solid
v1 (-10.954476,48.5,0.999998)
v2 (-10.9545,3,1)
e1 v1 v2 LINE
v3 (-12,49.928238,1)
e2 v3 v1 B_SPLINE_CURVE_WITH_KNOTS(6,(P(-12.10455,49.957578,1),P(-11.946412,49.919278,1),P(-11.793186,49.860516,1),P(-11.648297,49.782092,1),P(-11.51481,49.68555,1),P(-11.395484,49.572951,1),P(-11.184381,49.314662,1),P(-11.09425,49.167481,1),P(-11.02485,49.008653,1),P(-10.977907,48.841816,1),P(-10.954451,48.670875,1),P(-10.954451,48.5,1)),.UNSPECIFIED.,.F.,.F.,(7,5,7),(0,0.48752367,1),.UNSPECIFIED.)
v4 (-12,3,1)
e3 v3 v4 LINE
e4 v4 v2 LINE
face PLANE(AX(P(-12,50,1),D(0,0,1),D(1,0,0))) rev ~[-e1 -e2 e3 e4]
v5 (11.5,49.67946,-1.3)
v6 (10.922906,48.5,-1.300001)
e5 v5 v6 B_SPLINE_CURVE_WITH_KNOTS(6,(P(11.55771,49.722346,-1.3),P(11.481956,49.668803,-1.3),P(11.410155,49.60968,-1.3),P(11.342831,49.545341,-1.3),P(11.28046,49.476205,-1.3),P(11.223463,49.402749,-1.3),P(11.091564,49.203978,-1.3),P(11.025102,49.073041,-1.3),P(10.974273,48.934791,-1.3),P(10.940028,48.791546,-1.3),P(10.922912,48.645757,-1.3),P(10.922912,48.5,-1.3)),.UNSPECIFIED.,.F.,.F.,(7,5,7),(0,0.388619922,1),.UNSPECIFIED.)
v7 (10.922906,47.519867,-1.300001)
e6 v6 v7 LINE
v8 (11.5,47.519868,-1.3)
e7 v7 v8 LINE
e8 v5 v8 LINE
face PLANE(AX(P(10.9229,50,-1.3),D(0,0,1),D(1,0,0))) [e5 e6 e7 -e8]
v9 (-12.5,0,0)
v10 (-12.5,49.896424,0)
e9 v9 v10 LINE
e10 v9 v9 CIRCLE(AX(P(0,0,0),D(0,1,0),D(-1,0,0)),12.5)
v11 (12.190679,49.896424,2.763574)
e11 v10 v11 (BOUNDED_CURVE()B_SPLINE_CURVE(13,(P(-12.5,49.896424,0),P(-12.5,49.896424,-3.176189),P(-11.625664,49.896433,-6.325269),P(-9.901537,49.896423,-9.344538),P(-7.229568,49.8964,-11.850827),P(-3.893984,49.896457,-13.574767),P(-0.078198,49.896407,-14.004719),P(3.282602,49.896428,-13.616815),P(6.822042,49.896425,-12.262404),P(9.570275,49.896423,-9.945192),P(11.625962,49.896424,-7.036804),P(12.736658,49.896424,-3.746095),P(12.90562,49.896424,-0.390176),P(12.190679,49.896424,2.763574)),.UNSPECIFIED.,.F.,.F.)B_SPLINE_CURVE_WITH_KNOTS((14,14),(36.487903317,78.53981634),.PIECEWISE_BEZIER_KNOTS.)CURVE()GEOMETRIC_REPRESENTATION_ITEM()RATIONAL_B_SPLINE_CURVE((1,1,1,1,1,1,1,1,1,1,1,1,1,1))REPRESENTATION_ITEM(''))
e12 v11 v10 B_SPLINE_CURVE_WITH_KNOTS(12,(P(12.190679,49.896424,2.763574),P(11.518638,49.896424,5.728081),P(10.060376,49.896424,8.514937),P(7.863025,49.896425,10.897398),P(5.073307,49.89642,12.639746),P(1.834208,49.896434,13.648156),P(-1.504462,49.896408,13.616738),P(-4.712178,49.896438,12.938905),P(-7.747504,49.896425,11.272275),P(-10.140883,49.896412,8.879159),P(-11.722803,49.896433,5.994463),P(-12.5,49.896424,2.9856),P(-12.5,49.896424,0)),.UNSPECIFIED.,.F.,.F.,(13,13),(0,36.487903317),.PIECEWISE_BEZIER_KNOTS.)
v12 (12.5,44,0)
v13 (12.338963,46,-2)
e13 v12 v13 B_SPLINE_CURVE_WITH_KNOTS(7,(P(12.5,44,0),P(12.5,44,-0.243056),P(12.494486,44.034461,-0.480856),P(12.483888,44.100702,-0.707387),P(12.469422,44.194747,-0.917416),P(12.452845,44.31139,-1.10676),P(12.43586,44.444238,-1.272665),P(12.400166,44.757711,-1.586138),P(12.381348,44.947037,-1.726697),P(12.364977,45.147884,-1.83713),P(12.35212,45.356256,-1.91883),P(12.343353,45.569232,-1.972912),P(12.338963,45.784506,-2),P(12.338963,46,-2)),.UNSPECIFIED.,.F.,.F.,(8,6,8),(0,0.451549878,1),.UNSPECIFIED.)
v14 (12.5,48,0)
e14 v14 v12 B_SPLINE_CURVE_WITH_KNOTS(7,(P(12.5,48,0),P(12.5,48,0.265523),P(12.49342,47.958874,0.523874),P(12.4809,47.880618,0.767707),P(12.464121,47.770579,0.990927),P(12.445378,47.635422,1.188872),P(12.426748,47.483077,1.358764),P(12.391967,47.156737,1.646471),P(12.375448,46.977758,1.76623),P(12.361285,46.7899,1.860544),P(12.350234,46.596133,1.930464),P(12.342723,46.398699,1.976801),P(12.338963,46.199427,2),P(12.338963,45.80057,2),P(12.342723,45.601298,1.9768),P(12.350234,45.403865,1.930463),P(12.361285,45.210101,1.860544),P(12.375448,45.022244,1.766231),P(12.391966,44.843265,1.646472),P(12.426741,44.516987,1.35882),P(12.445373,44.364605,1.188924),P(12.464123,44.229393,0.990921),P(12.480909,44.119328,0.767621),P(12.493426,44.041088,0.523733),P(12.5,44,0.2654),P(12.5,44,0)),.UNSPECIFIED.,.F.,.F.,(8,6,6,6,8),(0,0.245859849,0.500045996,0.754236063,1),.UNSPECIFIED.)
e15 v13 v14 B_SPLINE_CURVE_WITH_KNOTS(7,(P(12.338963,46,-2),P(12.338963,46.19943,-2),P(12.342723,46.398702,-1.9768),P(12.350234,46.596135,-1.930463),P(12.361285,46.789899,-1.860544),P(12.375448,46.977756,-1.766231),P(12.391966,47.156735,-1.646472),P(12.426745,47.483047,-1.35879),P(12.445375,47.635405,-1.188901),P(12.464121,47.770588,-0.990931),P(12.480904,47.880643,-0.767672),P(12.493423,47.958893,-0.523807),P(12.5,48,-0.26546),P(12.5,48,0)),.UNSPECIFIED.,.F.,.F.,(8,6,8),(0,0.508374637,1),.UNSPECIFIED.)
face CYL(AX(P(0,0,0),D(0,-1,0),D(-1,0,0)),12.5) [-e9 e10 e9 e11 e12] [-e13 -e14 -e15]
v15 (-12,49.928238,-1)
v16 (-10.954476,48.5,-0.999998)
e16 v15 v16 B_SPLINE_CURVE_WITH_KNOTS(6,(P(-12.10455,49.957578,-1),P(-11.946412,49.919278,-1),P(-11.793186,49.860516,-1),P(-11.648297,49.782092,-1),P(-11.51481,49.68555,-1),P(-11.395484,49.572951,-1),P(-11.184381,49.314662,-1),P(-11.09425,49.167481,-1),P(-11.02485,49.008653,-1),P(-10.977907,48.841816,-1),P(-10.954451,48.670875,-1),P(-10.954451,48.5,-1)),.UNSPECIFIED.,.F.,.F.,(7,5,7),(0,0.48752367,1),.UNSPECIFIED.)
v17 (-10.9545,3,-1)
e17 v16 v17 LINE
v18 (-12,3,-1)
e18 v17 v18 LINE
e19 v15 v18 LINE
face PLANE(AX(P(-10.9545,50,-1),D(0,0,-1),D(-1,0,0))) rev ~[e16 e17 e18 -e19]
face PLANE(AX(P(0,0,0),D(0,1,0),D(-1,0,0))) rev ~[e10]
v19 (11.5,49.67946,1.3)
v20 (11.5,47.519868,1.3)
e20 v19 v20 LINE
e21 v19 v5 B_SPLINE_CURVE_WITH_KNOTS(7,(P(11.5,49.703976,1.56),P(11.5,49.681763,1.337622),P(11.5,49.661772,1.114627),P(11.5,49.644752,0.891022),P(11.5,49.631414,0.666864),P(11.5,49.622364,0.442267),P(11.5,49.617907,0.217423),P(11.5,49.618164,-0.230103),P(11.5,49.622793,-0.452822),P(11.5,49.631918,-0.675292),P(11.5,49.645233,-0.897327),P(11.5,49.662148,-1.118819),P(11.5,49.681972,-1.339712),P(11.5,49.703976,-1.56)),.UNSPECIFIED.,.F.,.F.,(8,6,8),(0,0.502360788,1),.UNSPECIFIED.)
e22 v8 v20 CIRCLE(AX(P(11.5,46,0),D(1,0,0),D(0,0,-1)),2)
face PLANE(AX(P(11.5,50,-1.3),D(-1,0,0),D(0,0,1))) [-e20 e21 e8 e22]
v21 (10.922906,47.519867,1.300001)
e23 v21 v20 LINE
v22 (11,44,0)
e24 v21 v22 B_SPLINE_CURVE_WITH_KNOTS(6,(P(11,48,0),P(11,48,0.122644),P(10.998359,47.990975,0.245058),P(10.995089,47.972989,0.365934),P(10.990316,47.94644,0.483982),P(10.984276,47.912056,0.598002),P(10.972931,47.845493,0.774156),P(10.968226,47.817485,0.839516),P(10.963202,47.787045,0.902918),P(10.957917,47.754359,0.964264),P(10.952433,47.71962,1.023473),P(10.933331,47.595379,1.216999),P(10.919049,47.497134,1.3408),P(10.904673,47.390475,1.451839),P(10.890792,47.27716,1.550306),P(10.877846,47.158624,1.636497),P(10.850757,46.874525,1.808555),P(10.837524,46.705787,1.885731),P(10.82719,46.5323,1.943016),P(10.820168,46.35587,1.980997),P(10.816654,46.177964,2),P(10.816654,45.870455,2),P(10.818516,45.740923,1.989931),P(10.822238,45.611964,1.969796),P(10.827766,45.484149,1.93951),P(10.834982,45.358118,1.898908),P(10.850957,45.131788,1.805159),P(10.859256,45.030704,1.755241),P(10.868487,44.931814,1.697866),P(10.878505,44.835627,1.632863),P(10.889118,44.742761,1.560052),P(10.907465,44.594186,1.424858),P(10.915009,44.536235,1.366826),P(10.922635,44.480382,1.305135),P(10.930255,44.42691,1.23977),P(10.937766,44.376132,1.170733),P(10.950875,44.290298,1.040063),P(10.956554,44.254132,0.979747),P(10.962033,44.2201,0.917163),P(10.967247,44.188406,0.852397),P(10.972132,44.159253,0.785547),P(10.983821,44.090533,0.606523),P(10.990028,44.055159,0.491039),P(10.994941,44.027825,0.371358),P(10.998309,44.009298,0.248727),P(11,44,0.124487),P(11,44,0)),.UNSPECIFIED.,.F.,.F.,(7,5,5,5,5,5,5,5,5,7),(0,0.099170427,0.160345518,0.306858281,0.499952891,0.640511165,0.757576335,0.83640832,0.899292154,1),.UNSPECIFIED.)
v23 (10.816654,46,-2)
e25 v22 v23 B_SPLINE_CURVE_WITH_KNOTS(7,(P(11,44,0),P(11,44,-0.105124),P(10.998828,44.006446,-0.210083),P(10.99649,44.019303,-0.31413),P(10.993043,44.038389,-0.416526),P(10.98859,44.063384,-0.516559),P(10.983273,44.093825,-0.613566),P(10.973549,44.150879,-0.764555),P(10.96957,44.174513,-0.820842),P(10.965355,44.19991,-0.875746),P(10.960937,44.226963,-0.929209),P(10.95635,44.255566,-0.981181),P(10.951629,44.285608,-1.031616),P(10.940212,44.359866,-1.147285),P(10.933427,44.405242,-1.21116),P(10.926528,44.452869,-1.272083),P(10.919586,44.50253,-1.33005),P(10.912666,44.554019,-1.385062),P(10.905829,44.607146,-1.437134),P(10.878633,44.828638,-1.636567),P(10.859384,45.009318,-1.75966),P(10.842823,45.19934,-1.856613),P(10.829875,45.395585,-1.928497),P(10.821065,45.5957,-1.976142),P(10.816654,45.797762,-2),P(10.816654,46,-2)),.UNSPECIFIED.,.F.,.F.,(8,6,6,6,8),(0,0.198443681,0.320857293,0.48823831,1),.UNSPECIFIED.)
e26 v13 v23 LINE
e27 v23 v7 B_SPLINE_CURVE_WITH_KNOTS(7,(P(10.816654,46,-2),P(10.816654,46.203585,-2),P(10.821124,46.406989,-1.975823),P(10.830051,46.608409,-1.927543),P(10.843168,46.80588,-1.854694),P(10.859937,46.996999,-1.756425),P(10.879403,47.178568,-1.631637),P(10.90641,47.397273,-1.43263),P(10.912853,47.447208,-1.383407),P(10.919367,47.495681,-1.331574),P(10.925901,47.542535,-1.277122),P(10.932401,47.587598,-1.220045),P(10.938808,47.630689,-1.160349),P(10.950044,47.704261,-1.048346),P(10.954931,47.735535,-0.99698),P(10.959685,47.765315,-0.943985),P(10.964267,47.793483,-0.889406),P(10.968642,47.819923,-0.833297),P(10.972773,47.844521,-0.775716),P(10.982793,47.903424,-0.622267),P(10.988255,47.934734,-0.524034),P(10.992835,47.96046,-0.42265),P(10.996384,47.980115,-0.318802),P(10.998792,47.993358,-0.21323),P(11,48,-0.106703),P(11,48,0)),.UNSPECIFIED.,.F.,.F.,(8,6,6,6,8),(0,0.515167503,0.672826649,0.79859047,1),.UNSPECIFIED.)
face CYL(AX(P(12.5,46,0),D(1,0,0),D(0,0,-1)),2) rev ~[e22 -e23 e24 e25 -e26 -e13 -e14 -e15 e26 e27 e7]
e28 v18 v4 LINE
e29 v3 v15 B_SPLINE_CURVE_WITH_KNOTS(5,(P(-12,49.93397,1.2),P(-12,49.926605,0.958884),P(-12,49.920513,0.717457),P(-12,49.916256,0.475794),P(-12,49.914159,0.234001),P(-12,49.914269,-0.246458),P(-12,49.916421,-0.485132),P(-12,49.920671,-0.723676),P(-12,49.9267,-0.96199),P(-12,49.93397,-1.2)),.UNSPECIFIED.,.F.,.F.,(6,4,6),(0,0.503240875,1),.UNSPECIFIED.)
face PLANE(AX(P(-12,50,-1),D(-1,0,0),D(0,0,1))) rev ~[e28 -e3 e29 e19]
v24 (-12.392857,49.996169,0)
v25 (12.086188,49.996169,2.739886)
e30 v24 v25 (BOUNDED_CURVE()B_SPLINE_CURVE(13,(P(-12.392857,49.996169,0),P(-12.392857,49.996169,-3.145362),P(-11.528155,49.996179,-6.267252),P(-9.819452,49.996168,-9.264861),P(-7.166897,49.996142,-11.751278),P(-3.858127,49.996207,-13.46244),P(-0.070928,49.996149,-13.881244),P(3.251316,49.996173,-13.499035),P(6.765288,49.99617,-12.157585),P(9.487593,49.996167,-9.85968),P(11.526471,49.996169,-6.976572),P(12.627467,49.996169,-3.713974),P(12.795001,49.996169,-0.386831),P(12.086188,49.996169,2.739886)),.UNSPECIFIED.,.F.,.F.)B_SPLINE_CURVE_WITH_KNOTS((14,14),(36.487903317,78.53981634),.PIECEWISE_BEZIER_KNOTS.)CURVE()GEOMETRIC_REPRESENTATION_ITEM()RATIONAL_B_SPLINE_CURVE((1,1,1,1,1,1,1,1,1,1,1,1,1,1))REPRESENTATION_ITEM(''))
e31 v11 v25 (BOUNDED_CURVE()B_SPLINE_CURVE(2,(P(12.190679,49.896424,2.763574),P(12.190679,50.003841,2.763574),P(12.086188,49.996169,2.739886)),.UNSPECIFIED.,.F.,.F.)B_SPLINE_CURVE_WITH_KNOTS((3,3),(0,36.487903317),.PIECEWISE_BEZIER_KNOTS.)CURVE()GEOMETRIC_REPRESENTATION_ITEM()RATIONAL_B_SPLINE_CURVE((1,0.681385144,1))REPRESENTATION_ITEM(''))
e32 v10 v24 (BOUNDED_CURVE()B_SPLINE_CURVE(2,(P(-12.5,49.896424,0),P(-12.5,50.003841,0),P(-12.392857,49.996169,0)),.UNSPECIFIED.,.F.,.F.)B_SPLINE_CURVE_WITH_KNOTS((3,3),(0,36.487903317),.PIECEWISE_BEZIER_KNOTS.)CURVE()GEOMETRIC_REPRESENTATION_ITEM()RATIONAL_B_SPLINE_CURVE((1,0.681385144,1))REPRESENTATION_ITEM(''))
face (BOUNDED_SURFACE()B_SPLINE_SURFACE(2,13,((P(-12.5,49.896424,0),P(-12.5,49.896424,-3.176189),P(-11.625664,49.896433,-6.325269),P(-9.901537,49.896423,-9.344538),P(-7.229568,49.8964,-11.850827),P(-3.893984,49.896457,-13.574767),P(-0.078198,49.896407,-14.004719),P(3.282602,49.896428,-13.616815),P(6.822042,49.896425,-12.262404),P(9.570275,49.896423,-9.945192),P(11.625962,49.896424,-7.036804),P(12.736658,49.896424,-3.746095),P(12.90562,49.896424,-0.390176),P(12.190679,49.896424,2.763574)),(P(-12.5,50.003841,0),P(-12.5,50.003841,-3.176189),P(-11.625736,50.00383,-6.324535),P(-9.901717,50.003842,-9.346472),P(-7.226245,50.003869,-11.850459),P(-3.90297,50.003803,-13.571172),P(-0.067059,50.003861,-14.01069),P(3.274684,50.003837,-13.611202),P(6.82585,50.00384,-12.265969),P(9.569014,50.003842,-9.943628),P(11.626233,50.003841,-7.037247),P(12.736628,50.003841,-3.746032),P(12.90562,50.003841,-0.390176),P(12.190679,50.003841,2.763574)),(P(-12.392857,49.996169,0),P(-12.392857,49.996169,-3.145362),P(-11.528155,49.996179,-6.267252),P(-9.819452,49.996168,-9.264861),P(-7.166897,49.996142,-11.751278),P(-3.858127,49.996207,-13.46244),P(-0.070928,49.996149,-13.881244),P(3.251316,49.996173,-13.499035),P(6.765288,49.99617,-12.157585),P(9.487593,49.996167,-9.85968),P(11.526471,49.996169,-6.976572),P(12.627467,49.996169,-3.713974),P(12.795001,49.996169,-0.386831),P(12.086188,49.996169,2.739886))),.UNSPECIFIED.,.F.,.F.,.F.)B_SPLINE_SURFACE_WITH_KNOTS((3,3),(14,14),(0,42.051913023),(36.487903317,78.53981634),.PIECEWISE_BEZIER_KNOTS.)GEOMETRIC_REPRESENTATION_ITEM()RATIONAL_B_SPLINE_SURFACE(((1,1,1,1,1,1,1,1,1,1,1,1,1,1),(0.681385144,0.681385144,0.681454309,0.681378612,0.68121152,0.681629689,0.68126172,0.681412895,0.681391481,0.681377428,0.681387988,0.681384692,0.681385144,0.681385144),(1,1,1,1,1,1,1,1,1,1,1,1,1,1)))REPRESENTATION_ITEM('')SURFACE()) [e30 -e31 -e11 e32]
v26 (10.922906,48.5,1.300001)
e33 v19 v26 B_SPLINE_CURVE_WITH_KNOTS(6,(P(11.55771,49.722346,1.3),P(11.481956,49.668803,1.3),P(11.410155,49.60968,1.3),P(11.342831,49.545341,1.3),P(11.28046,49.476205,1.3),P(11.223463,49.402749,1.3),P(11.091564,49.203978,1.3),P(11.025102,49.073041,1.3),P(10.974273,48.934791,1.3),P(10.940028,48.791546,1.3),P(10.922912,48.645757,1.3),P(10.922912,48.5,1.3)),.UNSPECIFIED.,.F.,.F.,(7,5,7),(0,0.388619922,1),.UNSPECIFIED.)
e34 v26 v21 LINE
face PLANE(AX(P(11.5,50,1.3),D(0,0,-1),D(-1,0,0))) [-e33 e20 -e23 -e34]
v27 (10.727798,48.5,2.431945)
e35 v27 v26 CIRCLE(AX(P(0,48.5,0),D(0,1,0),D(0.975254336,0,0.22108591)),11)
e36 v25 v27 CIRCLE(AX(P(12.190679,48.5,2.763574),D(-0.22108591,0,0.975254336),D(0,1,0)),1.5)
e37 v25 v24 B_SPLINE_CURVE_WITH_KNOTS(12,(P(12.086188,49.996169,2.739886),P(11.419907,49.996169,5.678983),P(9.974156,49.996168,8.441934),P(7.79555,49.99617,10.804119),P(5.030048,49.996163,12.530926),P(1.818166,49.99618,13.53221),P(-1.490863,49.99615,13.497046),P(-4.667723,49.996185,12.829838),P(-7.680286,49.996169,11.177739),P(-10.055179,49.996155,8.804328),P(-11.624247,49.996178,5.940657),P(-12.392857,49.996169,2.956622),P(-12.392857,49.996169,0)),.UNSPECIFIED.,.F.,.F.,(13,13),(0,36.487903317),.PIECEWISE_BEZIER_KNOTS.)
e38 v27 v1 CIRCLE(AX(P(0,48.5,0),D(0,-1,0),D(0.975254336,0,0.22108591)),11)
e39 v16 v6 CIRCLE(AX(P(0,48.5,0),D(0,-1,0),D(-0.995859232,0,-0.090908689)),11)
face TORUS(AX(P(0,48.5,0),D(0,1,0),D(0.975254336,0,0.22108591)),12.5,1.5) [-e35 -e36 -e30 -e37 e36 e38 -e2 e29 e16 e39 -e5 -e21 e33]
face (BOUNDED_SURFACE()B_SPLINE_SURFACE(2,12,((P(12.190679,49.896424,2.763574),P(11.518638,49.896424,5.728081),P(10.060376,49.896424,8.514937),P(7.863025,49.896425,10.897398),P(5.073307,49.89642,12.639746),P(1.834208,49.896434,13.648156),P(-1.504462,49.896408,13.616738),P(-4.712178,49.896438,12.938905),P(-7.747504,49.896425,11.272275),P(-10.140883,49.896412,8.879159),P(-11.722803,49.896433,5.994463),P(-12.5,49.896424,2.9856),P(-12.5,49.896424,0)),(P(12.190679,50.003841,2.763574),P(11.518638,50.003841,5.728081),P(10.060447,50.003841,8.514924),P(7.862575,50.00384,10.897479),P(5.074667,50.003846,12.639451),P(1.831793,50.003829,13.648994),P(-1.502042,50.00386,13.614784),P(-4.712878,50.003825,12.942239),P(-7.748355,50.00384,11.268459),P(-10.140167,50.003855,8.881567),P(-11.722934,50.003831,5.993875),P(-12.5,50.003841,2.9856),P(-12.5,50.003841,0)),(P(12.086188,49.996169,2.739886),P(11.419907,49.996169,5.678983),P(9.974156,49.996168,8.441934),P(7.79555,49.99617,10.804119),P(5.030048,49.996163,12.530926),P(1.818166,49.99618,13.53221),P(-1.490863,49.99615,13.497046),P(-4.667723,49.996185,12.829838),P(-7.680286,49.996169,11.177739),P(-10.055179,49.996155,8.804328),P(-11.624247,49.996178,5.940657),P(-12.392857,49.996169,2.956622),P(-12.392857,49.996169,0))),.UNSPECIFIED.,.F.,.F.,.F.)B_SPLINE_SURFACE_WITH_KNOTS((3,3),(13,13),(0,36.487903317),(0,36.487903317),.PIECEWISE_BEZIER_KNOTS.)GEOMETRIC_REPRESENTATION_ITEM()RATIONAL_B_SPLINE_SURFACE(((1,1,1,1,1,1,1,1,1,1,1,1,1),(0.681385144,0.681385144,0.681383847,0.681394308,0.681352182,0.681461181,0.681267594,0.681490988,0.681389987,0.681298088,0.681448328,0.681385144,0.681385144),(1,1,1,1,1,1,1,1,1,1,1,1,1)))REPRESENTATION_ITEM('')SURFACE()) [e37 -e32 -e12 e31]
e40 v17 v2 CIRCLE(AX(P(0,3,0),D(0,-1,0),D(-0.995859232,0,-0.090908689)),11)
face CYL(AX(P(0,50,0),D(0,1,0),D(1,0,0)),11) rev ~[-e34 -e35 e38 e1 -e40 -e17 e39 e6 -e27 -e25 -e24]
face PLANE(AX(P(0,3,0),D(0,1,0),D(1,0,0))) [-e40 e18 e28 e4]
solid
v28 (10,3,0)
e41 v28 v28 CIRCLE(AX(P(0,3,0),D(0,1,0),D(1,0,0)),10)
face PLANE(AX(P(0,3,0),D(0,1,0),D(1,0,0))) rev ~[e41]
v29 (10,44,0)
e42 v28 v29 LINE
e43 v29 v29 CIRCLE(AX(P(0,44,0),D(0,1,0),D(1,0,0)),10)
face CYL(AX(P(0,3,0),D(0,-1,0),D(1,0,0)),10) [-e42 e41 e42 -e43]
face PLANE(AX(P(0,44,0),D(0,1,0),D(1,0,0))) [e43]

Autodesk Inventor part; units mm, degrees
ref_plane "YZ Plane" through (0, 0, 0) normal (1, 0, 0) x (0, 1, 0)
ref_plane "XZ Plane" through (0, 0, 0) normal (0, 1, 0) x (-1, 0, 0)
sketch "Sketch1" plane through (0, 0, 0) normal (0, 1, 0) x (-1, 0, 0)
  circle A0 centre (0, 0) radius 12.5
  dimension "d0" = 25
extrude "Extrusion1" add sketch "Sketch1" along normal blind 50
sketch "Sketch2" plane through (0, 50, 0) normal (0, 1, 0) x (1, 0, 0)
  circle A0 centre (0, 0) radius 11
  circle A1 centre (0, 0) radius 12.5 projected
  line L0 (-12, -1) -> (-10.9545, -1)
  line L1 (-10.9545, 1) -> (-12, 1)
  line L2 (-12, 1) -> (-12, -1)
  point P0 (-12, 0)
  dimension "d3" = 22
  dimension "d4" = 12
  dimension "d5" = 1
  dimension "d6" = 1
  dimension "d7" = 1.0455
extrude "Extrusion2" cut sketch "Sketch2" against normal blind 47 contours A0 | A0 L0 L2 L1
sketch "Sketch3" plane through (0, 3, 0) normal (0, 1, 0) x (1, 0, 0)
  circle A0 centre (0, 0) radius 10
  arc A1 (-10.9545, -1) -> (-10.9545, 1) centre (0, 0) ccw projected
  dimension "d10" = 20
extrude "Extrusion3" add sketch "Sketch3" along normal blind 41 separate body
ref_plane "Work Plane1" through (12.5, 0, 0) normal (1, 0, 0) x (0, 0, -1)
sketch "Sketch4" plane through (12.5, 0, 0) normal (1, 0, 0) x (0, 0, -1)
  circle A0 centre (0, 46) radius 2
  line L0 (-11, 50) -> (11, 50) projected
  point P0 (0, 0)
  point P1 (0, 50)
  point P2 (1, 50)
  point P3 (-1, 50)
  dimension "d13" = 4
  dimension "d14" = 4
extrude "Extrusion4" cut sketch "Sketch4" against normal blind 3
sketch "Sketch5" plane through (0, 50, 0) normal (0, 1, 0) x (1, 0, 0)
  line L0 (11.5, -1.3) -> (10.9229, -1.3)
  line L1 (10.9229, 1.3) -> (11.5, 1.3)
  line L2 (11.5, 1.3) -> (11.5, -1.3)
  arc A0 (-10.9545, -1) -> (-10.9545, 1) centre (0, 0) ccw projected
  point P0 (11, 0)
  dimension "d17" = 1.3
  dimension "d18" = 1.3
  dimension "d19" = 0.5
extrude "Extrusion5" cut sketch "Sketch5" against normal blind 3
fillet "Fillet1" radius 1.5 2 edges at (-0.1508, 50, -10.999) (-0.1508, 50, 10.999)
fillet "Fillet2" radius 0.1 2 edges at (-1.3904, 50, 12.4224) (1.3904, 50, -12.4224)
properties part number "V1.0-battery-holder-A"
